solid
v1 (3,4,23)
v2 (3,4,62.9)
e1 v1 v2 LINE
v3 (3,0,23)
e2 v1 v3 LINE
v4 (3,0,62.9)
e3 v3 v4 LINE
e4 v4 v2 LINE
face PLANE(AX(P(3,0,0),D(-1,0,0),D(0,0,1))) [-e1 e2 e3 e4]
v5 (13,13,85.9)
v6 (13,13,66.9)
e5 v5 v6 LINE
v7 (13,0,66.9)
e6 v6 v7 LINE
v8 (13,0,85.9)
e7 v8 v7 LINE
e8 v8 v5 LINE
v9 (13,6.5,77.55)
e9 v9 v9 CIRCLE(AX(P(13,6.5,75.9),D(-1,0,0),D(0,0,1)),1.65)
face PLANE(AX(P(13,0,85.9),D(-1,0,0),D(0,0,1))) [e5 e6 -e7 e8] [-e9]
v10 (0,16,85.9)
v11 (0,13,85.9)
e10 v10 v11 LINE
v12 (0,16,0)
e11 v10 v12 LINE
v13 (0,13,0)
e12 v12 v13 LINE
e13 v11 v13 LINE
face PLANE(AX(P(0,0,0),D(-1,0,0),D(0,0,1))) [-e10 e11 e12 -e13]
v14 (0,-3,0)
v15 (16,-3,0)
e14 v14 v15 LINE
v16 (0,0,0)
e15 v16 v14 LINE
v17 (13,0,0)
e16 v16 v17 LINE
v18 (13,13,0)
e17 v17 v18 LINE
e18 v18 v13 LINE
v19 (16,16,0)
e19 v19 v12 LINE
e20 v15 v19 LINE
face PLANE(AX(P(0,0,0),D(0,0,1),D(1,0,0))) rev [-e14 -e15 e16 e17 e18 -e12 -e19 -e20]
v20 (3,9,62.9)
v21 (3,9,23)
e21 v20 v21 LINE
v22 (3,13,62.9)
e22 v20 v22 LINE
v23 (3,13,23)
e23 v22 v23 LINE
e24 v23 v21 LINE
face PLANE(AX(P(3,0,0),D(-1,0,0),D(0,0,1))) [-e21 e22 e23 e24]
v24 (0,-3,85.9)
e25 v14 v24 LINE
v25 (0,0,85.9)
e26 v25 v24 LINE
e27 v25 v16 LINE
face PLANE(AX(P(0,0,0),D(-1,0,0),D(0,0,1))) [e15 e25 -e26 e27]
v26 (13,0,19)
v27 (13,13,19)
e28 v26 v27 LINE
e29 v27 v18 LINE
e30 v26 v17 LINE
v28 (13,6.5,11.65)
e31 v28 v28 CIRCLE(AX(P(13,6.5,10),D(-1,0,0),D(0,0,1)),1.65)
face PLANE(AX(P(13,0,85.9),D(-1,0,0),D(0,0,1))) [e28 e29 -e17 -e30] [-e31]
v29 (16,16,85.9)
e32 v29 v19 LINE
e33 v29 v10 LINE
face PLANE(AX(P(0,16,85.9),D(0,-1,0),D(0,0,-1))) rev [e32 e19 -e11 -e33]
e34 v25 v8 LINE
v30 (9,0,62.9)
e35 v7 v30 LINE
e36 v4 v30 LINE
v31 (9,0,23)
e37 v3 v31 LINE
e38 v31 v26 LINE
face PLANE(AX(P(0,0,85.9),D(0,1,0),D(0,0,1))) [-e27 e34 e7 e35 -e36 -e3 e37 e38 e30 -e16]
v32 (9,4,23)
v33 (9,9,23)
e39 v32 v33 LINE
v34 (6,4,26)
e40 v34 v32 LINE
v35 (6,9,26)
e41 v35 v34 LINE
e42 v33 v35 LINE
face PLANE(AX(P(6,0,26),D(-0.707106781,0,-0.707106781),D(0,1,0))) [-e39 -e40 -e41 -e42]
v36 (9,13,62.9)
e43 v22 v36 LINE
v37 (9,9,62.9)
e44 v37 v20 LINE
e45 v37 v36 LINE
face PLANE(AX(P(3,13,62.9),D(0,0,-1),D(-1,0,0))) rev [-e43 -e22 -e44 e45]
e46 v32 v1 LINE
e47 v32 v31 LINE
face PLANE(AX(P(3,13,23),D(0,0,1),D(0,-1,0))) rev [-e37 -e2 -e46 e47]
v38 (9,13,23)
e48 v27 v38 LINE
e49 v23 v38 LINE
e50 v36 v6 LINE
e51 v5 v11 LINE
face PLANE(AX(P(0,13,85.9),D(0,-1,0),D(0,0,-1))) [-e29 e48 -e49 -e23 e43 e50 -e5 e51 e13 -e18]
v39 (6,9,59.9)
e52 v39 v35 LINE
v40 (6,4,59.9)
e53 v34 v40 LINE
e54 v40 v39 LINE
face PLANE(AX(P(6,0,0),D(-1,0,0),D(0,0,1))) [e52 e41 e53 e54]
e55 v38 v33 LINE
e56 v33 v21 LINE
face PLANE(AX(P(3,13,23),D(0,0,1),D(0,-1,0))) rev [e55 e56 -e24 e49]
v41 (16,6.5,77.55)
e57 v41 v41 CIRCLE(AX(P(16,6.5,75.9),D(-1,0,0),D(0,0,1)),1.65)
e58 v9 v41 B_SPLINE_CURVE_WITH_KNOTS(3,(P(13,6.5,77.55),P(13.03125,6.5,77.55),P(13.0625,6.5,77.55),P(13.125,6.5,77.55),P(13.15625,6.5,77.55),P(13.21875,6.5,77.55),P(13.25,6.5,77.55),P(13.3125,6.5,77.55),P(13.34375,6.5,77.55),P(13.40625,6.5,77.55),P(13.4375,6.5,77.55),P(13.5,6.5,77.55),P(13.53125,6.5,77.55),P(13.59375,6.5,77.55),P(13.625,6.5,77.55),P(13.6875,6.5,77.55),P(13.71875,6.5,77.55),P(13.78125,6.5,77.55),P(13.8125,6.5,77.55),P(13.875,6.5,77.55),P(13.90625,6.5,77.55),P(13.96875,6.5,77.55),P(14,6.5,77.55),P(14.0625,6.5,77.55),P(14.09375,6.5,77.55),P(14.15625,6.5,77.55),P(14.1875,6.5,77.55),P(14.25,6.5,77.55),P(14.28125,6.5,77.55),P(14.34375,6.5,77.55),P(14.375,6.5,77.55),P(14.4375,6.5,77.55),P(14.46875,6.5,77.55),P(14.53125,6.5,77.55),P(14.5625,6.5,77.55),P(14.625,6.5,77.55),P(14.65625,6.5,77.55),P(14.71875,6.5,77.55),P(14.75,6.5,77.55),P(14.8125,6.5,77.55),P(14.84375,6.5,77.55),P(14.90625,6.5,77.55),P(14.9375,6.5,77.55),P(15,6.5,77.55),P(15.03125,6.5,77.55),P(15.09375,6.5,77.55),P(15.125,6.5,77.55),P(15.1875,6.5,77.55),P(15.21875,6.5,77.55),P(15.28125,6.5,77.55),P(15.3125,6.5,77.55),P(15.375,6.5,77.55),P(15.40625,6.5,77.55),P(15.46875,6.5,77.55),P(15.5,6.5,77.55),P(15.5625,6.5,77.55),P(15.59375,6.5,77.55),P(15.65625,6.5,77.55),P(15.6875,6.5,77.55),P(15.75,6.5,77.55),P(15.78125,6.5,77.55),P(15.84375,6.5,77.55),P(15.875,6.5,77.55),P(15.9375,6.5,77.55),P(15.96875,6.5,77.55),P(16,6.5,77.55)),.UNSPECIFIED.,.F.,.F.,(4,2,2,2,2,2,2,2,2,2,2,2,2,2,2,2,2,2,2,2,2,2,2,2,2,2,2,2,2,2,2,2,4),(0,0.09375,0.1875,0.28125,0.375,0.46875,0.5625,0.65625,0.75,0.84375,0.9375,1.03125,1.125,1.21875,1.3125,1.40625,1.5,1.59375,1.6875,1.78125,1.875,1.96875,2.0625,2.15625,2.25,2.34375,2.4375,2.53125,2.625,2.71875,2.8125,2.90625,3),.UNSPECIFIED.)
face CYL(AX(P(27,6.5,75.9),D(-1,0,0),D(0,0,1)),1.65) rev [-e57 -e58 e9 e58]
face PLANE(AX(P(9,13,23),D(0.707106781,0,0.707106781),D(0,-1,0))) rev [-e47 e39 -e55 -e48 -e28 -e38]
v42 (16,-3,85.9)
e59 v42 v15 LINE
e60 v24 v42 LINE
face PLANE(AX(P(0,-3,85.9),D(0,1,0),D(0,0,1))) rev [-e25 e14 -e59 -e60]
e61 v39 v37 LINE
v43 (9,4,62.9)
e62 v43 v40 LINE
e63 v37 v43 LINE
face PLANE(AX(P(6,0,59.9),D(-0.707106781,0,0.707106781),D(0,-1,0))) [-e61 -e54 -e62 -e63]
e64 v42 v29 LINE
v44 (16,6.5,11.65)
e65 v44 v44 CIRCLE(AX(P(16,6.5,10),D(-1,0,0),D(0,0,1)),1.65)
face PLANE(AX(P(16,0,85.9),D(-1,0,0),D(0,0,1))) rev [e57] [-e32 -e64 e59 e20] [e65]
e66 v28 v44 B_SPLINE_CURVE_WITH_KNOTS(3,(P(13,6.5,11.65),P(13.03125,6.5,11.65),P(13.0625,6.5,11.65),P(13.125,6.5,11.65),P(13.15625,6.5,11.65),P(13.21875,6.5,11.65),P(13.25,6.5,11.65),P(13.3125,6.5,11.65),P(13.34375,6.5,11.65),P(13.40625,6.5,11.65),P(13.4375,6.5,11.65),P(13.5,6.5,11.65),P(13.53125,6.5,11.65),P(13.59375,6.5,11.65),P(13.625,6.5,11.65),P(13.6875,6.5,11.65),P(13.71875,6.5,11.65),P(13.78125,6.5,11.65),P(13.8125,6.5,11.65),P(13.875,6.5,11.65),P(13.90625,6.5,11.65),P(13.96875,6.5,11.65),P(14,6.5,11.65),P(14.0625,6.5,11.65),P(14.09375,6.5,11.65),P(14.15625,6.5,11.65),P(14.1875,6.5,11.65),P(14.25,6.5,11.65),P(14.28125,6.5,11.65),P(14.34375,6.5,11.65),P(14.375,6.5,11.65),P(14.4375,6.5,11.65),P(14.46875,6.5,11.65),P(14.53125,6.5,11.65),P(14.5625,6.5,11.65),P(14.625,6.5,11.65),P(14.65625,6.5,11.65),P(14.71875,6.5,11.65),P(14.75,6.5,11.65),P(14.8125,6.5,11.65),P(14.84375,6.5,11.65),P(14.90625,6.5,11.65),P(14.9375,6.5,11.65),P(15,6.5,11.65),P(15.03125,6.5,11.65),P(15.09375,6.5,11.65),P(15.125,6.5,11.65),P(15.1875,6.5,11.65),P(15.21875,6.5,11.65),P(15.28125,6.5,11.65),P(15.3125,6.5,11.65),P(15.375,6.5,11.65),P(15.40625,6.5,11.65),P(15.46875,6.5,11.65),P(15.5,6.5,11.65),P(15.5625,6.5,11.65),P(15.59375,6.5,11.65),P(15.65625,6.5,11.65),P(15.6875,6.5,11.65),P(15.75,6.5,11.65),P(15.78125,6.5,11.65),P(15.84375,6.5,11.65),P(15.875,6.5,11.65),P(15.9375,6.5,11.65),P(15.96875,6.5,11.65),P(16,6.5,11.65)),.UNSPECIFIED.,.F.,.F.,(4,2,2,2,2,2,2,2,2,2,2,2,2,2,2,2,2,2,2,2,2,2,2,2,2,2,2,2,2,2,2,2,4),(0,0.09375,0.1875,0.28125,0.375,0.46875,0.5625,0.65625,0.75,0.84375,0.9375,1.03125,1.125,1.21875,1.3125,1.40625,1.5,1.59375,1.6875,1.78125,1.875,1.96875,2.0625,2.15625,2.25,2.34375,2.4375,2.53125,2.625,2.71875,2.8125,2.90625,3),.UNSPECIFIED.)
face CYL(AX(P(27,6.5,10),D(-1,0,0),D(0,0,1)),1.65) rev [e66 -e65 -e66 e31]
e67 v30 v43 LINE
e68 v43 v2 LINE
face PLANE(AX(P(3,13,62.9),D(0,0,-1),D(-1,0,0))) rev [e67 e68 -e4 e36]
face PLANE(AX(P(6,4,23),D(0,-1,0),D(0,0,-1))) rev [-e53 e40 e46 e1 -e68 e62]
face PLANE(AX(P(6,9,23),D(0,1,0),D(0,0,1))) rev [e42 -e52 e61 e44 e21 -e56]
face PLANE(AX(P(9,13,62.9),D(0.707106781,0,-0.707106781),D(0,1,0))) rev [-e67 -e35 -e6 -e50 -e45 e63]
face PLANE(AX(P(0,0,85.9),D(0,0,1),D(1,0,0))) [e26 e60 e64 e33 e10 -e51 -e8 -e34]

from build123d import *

# Parameters (mm, degrees)
SKETCH_1_W          = 19
SKETCH_1_H          = 19
SKETCH_1_W_2        = 13
SKETCH_1_H_2        = 13
EXTRUDE_1_DEPTH     = 85.9
SKETCH_2_R          = 1.65
CUT_EXTRUDE_1_DEPTH = 30
SKETCH_3_W          = 116.915177823
SKETCH_3_H          = 46.219516436
CUT_EXTRUDE_2_DEPTH = 3
SKETCH_4_W          = 5
SKETCH_4_H          = 13
EXTRUDE_1_2_DEPTH   = 10
SKETCH_5_W          = 29.9
SKETCH_5_H          = 5
EXTRUDE_2_DEPTH     = 10
SKETCH_6_W          = 39.9
SKETCH_6_H          = 13
EXTRUDE_3_DEPTH     = 10
SKETCH_8_W          = 39.9
SKETCH_8_H          = 5
CUT_EXTRUDE_3_DEPTH = 3
CHAMFER_1_SIZE      = 3
CHAMFER_2_SIZE      = 4


with BuildPart() as part:
    # 草图1 → Extrude 1 (new body)
    with BuildSketch(Plane.XY):
        with Locations((6.5, 6.5)):
            Rectangle(SKETCH_1_W, SKETCH_1_H)
        with Locations((6.5, 6.5)):
            Rectangle(SKETCH_1_W_2, SKETCH_1_H_2, mode=Mode.SUBTRACT)
    extrude(amount=EXTRUDE_1_DEPTH)

    # 草图2 → 切除-拉伸1 (cut)
    with BuildSketch(Plane.ZY.offset(3)):
        with Locations((10, 6.5)):
            Circle(SKETCH_2_R)
        with Locations((75.9, 6.5)):
            Circle(SKETCH_2_R)
    extrude(amount=-CUT_EXTRUDE_1_DEPTH, mode=Mode.SUBTRACT)

    # 草图3 → 切除-拉伸2 (cut)
    with BuildSketch(Plane.ZY.offset(3)):
        with Locations((53.162237228, 0.202739406)):
            Rectangle(SKETCH_3_W, SKETCH_3_H)
    extrude(amount=-CUT_EXTRUDE_2_DEPTH, mode=Mode.SUBTRACT)

    # 草图4 → Extrude 1 2 (add)
    with BuildSketch(Plane.ZY.offset(-13)):
        with Locations((25.5, 6.5)):
            Rectangle(SKETCH_4_W, SKETCH_4_H)
        with Locations((60.4, 6.5)):
            Rectangle(SKETCH_4_W, SKETCH_4_H)
    extrude(amount=EXTRUDE_1_2_DEPTH)

    # 草图5 → 凸台-拉伸2 (add)
    with BuildSketch(Plane.ZY.offset(-13)):
        with Locations((42.95, 6.5)):
            Rectangle(SKETCH_5_W, SKETCH_5_H)
    extrude(amount=EXTRUDE_2_DEPTH)

    # 草图6 → 凸台-拉伸3 (add)
    with BuildSketch(Plane.ZY.offset(-13)):
        with Locations((42.95, 6.5)):
            Rectangle(SKETCH_6_W, SKETCH_6_H)
    extrude(amount=EXTRUDE_3_DEPTH)

    # 草图8 → 切除-拉伸3 (cut)
    with BuildSketch(Plane.ZY.offset(-3)):
        with Locations((42.95, 6.5)):
            Rectangle(SKETCH_8_W, SKETCH_8_H)
    extrude(amount=-CUT_EXTRUDE_3_DEPTH, mode=Mode.SUBTRACT)

    # 倒角1
    chamfer_1_edges = [part.edges().sort_by_distance(p)[0] for p in [
        (6, 6.5, 23),
        (6, 6.5, 62.9),
    ]]
    chamfer(chamfer_1_edges, length=CHAMFER_1_SIZE)

    # 倒角2
    chamfer_2_edges = [part.edges().sort_by_distance(p)[0] for p in [
        (13, 6.5, 23),
        (13, 6.5, 62.9),
    ]]
    chamfer(chamfer_2_edges, length=CHAMFER_2_SIZE - 0.0001)  # a hair under: the kernel refuses the full size


solid = part.part
